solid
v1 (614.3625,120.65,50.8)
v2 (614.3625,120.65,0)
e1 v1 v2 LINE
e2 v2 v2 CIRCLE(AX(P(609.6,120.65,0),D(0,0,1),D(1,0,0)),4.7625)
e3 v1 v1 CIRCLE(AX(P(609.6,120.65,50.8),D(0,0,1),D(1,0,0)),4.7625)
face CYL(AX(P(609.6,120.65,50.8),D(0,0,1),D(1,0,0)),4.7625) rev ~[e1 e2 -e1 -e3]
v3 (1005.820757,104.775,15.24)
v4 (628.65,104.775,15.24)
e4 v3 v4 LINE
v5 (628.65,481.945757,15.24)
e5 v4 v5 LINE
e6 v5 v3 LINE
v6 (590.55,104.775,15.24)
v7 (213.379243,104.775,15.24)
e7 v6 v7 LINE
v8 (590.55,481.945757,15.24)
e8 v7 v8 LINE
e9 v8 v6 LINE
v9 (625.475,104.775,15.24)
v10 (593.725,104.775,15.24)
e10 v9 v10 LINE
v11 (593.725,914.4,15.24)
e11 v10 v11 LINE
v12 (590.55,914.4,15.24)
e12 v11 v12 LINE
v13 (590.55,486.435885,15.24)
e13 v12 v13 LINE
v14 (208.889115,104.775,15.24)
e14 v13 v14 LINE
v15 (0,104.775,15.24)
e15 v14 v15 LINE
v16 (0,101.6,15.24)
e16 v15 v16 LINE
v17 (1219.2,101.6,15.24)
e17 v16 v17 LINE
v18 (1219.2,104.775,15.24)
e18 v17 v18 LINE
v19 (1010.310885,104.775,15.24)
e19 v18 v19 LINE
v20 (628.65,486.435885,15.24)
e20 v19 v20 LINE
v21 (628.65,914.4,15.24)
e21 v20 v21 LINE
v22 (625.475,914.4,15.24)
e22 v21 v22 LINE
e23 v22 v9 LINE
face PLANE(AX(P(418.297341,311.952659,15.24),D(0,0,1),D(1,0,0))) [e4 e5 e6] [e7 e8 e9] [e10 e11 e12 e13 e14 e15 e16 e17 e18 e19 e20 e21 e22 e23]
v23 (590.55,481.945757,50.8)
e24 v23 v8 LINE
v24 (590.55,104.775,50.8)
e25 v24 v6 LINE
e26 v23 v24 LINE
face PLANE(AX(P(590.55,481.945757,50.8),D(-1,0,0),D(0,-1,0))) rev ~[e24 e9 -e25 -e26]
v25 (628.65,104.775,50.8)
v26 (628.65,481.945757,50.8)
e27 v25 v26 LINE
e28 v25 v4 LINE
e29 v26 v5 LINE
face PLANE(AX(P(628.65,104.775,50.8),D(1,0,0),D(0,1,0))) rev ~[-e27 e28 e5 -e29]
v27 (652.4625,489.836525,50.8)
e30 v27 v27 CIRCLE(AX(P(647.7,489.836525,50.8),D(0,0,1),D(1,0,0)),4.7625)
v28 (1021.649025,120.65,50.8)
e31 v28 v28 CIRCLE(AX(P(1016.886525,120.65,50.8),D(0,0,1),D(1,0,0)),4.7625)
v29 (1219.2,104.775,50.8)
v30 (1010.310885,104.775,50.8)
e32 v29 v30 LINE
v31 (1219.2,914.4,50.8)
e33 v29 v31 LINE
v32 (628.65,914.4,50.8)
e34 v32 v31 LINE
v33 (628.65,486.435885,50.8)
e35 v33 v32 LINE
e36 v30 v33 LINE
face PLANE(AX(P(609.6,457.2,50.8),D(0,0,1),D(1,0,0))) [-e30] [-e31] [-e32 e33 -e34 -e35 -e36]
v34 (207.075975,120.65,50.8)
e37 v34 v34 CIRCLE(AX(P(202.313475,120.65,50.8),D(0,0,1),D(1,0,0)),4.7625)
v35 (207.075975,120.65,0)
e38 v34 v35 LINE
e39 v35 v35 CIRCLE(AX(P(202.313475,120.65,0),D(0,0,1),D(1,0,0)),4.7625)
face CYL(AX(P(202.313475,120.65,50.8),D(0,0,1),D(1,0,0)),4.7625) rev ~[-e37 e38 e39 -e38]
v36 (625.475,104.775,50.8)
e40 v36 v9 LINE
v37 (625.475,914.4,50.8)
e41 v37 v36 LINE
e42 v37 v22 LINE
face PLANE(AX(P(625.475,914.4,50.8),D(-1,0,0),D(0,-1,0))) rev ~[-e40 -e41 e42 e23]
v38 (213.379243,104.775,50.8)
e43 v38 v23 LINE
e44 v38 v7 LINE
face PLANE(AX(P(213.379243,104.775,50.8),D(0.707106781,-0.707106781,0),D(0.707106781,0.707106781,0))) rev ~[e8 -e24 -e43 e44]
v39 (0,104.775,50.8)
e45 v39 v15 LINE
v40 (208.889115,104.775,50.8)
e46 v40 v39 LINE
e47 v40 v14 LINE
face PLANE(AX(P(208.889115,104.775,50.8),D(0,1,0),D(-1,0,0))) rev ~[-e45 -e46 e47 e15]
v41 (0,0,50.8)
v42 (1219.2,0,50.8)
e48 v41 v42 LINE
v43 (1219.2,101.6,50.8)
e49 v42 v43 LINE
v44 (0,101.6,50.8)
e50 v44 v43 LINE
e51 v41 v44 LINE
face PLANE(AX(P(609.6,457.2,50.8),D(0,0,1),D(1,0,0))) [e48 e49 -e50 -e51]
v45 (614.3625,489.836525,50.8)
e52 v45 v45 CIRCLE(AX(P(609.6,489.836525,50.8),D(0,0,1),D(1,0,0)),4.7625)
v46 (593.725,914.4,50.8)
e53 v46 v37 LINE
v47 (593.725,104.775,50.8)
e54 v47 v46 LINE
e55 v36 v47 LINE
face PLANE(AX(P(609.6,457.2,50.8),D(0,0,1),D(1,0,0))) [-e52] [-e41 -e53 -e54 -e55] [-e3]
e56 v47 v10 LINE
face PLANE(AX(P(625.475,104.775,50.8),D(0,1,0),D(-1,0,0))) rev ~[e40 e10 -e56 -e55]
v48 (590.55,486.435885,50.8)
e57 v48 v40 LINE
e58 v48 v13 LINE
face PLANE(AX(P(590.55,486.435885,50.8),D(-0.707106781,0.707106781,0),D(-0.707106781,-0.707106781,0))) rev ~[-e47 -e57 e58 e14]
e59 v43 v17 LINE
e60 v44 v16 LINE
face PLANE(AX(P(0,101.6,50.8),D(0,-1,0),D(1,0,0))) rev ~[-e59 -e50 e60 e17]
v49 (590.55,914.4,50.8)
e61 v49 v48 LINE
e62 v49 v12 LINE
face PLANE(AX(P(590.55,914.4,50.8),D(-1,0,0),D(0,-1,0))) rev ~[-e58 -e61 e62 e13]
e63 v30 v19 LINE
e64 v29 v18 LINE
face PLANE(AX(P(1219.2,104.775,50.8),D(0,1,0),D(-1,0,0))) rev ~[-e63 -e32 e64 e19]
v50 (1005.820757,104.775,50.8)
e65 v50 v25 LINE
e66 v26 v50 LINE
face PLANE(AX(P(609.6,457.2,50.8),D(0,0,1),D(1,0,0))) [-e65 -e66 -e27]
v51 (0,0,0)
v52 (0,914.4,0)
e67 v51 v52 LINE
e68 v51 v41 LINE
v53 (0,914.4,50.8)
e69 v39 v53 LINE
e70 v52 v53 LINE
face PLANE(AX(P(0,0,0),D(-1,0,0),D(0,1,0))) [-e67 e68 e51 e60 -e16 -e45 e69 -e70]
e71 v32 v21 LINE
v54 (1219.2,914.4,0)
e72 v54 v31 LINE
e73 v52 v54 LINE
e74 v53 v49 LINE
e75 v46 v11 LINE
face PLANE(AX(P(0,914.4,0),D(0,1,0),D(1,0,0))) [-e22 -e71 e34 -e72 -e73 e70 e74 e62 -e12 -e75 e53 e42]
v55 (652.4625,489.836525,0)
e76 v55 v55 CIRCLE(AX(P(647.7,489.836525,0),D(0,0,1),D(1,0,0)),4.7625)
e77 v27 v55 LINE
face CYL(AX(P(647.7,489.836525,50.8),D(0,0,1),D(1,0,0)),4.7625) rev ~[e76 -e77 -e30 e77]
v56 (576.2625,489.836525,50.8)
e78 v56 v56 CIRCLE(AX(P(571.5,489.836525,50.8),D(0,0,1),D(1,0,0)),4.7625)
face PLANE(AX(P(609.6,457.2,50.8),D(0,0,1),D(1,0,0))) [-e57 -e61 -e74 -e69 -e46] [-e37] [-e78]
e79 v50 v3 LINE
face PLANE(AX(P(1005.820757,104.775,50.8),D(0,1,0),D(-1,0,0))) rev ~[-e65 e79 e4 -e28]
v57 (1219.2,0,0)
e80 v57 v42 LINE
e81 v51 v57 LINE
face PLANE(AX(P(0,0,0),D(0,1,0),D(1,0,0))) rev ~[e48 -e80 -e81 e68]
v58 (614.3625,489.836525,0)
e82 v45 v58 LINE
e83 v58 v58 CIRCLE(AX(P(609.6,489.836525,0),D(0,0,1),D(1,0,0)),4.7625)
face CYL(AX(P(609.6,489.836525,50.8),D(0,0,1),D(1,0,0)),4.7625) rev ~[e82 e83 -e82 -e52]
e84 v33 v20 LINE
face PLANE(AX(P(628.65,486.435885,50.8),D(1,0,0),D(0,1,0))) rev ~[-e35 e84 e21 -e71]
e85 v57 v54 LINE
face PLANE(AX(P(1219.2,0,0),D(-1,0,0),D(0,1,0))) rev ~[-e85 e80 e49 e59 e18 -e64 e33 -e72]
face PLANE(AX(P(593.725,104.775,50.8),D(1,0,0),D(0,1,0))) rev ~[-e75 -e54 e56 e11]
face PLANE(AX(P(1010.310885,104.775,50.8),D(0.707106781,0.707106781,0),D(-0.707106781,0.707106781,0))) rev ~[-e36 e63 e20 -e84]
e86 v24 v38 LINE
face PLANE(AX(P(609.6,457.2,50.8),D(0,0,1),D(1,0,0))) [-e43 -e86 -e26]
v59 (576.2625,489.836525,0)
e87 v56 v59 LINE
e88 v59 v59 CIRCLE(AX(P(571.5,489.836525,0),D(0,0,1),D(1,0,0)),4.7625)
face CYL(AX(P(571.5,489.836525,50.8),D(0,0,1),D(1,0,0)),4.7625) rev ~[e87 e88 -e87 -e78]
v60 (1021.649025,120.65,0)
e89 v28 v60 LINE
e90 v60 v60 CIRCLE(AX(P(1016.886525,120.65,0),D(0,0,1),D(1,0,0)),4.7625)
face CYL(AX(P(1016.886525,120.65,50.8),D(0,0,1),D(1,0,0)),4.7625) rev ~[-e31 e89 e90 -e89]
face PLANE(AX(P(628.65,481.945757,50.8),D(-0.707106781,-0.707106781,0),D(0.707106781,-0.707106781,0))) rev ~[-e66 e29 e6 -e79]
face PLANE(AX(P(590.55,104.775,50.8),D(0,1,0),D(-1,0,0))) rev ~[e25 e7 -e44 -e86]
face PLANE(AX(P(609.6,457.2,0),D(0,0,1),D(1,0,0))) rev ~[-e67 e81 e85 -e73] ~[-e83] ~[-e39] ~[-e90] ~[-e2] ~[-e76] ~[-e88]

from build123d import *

# Parameters (mm, degrees)
F0_W     = 1219.2
F0_H     = 914.4
F1_DEPTH = 50.8
F2_W     = 3.175
F2_H     = 34.925
F3_DEPTH = 35.56
F4_R     = 4.7625
F5_DEPTH = 50.801


with BuildPart() as f1:
    # F0 (on Top) → F1 (new body)
    with BuildSketch(Plane.XY):
        with Locations((609.6, 457.2)):
            Rectangle(F0_W, F0_H)
    extrude(amount=F1_DEPTH)

    # F2 (on face) → F3 (cut)
    with BuildSketch(Plane.XY.offset(50.8)):
        Polygon((590.55, 486.4358851454), (243.8141148546, 139.7), (248.3042429151, 139.7), (590.55, 481.9457570849), align=None)
        Polygon((590.55, 914.4), (590.55, 535.8272938113), (590.55, 486.4358851454), (590.55, 481.9457570849), (590.55, 139.7), (593.725, 139.7), (593.725, 914.4), align=None)
        Polygon((970.8957570849, 139.7), (975.3858851454, 139.7), (628.65, 486.4358851454), (628.65, 481.9457570849), align=None)
        with Locations((592.1375, 122.2375)):
            Rectangle(F2_W, F2_H)
        Polygon((0, 104.775), (0, 101.6), (1219.2, 101.6), (1219.2, 104.775), (1059.7022938113, 104.775), (1010.3108851454, 104.775), (1005.8207570849, 104.775), (628.65, 104.775), (625.475, 104.775), (593.725, 104.775), (590.55, 104.775), (213.3792429151, 104.775), (208.8891148546, 104.775), (159.4977061887, 104.775), align=None)
        Polygon((243.8141148546, 139.7), (208.8891148546, 104.775), (213.3792429151, 104.775), (248.3042429151, 139.7), align=None)
        Polygon((1005.8207570849, 104.775), (1010.3108851454, 104.775), (975.3858851454, 139.7), (970.8957570849, 139.7), align=None)
        Polygon((628.65, 486.4358851454), (628.65, 535.8272938113), (628.65, 914.4), (625.475, 914.4), (625.475, 139.7), (628.65, 139.7), (628.65, 481.9457570849), align=None)
        with Locations((627.0625, 122.2375)):
            Rectangle(F2_W, F2_H)
    extrude(amount=-F3_DEPTH, mode=Mode.SUBTRACT)

    # F4 (on face) → F5 (cut, through all)
    with BuildSketch(Plane.XY.offset(50.8)):
        with Locations((202.3134745519, 120.65)):
            Circle(F4_R)
        with Locations((571.5, 489.8365254481)):
            Circle(F4_R)
        with Locations((609.6, 489.8365254481)):
            Circle(F4_R)
        with Locations((647.7, 489.8365254481)):
            Circle(F4_R)
        with Locations((609.6, 120.65)):
            Circle(F4_R)
        with Locations((1016.8865254481, 120.65)):
            Circle(F4_R)
    extrude(amount=-F5_DEPTH, mode=Mode.SUBTRACT)


solid = f1.part
